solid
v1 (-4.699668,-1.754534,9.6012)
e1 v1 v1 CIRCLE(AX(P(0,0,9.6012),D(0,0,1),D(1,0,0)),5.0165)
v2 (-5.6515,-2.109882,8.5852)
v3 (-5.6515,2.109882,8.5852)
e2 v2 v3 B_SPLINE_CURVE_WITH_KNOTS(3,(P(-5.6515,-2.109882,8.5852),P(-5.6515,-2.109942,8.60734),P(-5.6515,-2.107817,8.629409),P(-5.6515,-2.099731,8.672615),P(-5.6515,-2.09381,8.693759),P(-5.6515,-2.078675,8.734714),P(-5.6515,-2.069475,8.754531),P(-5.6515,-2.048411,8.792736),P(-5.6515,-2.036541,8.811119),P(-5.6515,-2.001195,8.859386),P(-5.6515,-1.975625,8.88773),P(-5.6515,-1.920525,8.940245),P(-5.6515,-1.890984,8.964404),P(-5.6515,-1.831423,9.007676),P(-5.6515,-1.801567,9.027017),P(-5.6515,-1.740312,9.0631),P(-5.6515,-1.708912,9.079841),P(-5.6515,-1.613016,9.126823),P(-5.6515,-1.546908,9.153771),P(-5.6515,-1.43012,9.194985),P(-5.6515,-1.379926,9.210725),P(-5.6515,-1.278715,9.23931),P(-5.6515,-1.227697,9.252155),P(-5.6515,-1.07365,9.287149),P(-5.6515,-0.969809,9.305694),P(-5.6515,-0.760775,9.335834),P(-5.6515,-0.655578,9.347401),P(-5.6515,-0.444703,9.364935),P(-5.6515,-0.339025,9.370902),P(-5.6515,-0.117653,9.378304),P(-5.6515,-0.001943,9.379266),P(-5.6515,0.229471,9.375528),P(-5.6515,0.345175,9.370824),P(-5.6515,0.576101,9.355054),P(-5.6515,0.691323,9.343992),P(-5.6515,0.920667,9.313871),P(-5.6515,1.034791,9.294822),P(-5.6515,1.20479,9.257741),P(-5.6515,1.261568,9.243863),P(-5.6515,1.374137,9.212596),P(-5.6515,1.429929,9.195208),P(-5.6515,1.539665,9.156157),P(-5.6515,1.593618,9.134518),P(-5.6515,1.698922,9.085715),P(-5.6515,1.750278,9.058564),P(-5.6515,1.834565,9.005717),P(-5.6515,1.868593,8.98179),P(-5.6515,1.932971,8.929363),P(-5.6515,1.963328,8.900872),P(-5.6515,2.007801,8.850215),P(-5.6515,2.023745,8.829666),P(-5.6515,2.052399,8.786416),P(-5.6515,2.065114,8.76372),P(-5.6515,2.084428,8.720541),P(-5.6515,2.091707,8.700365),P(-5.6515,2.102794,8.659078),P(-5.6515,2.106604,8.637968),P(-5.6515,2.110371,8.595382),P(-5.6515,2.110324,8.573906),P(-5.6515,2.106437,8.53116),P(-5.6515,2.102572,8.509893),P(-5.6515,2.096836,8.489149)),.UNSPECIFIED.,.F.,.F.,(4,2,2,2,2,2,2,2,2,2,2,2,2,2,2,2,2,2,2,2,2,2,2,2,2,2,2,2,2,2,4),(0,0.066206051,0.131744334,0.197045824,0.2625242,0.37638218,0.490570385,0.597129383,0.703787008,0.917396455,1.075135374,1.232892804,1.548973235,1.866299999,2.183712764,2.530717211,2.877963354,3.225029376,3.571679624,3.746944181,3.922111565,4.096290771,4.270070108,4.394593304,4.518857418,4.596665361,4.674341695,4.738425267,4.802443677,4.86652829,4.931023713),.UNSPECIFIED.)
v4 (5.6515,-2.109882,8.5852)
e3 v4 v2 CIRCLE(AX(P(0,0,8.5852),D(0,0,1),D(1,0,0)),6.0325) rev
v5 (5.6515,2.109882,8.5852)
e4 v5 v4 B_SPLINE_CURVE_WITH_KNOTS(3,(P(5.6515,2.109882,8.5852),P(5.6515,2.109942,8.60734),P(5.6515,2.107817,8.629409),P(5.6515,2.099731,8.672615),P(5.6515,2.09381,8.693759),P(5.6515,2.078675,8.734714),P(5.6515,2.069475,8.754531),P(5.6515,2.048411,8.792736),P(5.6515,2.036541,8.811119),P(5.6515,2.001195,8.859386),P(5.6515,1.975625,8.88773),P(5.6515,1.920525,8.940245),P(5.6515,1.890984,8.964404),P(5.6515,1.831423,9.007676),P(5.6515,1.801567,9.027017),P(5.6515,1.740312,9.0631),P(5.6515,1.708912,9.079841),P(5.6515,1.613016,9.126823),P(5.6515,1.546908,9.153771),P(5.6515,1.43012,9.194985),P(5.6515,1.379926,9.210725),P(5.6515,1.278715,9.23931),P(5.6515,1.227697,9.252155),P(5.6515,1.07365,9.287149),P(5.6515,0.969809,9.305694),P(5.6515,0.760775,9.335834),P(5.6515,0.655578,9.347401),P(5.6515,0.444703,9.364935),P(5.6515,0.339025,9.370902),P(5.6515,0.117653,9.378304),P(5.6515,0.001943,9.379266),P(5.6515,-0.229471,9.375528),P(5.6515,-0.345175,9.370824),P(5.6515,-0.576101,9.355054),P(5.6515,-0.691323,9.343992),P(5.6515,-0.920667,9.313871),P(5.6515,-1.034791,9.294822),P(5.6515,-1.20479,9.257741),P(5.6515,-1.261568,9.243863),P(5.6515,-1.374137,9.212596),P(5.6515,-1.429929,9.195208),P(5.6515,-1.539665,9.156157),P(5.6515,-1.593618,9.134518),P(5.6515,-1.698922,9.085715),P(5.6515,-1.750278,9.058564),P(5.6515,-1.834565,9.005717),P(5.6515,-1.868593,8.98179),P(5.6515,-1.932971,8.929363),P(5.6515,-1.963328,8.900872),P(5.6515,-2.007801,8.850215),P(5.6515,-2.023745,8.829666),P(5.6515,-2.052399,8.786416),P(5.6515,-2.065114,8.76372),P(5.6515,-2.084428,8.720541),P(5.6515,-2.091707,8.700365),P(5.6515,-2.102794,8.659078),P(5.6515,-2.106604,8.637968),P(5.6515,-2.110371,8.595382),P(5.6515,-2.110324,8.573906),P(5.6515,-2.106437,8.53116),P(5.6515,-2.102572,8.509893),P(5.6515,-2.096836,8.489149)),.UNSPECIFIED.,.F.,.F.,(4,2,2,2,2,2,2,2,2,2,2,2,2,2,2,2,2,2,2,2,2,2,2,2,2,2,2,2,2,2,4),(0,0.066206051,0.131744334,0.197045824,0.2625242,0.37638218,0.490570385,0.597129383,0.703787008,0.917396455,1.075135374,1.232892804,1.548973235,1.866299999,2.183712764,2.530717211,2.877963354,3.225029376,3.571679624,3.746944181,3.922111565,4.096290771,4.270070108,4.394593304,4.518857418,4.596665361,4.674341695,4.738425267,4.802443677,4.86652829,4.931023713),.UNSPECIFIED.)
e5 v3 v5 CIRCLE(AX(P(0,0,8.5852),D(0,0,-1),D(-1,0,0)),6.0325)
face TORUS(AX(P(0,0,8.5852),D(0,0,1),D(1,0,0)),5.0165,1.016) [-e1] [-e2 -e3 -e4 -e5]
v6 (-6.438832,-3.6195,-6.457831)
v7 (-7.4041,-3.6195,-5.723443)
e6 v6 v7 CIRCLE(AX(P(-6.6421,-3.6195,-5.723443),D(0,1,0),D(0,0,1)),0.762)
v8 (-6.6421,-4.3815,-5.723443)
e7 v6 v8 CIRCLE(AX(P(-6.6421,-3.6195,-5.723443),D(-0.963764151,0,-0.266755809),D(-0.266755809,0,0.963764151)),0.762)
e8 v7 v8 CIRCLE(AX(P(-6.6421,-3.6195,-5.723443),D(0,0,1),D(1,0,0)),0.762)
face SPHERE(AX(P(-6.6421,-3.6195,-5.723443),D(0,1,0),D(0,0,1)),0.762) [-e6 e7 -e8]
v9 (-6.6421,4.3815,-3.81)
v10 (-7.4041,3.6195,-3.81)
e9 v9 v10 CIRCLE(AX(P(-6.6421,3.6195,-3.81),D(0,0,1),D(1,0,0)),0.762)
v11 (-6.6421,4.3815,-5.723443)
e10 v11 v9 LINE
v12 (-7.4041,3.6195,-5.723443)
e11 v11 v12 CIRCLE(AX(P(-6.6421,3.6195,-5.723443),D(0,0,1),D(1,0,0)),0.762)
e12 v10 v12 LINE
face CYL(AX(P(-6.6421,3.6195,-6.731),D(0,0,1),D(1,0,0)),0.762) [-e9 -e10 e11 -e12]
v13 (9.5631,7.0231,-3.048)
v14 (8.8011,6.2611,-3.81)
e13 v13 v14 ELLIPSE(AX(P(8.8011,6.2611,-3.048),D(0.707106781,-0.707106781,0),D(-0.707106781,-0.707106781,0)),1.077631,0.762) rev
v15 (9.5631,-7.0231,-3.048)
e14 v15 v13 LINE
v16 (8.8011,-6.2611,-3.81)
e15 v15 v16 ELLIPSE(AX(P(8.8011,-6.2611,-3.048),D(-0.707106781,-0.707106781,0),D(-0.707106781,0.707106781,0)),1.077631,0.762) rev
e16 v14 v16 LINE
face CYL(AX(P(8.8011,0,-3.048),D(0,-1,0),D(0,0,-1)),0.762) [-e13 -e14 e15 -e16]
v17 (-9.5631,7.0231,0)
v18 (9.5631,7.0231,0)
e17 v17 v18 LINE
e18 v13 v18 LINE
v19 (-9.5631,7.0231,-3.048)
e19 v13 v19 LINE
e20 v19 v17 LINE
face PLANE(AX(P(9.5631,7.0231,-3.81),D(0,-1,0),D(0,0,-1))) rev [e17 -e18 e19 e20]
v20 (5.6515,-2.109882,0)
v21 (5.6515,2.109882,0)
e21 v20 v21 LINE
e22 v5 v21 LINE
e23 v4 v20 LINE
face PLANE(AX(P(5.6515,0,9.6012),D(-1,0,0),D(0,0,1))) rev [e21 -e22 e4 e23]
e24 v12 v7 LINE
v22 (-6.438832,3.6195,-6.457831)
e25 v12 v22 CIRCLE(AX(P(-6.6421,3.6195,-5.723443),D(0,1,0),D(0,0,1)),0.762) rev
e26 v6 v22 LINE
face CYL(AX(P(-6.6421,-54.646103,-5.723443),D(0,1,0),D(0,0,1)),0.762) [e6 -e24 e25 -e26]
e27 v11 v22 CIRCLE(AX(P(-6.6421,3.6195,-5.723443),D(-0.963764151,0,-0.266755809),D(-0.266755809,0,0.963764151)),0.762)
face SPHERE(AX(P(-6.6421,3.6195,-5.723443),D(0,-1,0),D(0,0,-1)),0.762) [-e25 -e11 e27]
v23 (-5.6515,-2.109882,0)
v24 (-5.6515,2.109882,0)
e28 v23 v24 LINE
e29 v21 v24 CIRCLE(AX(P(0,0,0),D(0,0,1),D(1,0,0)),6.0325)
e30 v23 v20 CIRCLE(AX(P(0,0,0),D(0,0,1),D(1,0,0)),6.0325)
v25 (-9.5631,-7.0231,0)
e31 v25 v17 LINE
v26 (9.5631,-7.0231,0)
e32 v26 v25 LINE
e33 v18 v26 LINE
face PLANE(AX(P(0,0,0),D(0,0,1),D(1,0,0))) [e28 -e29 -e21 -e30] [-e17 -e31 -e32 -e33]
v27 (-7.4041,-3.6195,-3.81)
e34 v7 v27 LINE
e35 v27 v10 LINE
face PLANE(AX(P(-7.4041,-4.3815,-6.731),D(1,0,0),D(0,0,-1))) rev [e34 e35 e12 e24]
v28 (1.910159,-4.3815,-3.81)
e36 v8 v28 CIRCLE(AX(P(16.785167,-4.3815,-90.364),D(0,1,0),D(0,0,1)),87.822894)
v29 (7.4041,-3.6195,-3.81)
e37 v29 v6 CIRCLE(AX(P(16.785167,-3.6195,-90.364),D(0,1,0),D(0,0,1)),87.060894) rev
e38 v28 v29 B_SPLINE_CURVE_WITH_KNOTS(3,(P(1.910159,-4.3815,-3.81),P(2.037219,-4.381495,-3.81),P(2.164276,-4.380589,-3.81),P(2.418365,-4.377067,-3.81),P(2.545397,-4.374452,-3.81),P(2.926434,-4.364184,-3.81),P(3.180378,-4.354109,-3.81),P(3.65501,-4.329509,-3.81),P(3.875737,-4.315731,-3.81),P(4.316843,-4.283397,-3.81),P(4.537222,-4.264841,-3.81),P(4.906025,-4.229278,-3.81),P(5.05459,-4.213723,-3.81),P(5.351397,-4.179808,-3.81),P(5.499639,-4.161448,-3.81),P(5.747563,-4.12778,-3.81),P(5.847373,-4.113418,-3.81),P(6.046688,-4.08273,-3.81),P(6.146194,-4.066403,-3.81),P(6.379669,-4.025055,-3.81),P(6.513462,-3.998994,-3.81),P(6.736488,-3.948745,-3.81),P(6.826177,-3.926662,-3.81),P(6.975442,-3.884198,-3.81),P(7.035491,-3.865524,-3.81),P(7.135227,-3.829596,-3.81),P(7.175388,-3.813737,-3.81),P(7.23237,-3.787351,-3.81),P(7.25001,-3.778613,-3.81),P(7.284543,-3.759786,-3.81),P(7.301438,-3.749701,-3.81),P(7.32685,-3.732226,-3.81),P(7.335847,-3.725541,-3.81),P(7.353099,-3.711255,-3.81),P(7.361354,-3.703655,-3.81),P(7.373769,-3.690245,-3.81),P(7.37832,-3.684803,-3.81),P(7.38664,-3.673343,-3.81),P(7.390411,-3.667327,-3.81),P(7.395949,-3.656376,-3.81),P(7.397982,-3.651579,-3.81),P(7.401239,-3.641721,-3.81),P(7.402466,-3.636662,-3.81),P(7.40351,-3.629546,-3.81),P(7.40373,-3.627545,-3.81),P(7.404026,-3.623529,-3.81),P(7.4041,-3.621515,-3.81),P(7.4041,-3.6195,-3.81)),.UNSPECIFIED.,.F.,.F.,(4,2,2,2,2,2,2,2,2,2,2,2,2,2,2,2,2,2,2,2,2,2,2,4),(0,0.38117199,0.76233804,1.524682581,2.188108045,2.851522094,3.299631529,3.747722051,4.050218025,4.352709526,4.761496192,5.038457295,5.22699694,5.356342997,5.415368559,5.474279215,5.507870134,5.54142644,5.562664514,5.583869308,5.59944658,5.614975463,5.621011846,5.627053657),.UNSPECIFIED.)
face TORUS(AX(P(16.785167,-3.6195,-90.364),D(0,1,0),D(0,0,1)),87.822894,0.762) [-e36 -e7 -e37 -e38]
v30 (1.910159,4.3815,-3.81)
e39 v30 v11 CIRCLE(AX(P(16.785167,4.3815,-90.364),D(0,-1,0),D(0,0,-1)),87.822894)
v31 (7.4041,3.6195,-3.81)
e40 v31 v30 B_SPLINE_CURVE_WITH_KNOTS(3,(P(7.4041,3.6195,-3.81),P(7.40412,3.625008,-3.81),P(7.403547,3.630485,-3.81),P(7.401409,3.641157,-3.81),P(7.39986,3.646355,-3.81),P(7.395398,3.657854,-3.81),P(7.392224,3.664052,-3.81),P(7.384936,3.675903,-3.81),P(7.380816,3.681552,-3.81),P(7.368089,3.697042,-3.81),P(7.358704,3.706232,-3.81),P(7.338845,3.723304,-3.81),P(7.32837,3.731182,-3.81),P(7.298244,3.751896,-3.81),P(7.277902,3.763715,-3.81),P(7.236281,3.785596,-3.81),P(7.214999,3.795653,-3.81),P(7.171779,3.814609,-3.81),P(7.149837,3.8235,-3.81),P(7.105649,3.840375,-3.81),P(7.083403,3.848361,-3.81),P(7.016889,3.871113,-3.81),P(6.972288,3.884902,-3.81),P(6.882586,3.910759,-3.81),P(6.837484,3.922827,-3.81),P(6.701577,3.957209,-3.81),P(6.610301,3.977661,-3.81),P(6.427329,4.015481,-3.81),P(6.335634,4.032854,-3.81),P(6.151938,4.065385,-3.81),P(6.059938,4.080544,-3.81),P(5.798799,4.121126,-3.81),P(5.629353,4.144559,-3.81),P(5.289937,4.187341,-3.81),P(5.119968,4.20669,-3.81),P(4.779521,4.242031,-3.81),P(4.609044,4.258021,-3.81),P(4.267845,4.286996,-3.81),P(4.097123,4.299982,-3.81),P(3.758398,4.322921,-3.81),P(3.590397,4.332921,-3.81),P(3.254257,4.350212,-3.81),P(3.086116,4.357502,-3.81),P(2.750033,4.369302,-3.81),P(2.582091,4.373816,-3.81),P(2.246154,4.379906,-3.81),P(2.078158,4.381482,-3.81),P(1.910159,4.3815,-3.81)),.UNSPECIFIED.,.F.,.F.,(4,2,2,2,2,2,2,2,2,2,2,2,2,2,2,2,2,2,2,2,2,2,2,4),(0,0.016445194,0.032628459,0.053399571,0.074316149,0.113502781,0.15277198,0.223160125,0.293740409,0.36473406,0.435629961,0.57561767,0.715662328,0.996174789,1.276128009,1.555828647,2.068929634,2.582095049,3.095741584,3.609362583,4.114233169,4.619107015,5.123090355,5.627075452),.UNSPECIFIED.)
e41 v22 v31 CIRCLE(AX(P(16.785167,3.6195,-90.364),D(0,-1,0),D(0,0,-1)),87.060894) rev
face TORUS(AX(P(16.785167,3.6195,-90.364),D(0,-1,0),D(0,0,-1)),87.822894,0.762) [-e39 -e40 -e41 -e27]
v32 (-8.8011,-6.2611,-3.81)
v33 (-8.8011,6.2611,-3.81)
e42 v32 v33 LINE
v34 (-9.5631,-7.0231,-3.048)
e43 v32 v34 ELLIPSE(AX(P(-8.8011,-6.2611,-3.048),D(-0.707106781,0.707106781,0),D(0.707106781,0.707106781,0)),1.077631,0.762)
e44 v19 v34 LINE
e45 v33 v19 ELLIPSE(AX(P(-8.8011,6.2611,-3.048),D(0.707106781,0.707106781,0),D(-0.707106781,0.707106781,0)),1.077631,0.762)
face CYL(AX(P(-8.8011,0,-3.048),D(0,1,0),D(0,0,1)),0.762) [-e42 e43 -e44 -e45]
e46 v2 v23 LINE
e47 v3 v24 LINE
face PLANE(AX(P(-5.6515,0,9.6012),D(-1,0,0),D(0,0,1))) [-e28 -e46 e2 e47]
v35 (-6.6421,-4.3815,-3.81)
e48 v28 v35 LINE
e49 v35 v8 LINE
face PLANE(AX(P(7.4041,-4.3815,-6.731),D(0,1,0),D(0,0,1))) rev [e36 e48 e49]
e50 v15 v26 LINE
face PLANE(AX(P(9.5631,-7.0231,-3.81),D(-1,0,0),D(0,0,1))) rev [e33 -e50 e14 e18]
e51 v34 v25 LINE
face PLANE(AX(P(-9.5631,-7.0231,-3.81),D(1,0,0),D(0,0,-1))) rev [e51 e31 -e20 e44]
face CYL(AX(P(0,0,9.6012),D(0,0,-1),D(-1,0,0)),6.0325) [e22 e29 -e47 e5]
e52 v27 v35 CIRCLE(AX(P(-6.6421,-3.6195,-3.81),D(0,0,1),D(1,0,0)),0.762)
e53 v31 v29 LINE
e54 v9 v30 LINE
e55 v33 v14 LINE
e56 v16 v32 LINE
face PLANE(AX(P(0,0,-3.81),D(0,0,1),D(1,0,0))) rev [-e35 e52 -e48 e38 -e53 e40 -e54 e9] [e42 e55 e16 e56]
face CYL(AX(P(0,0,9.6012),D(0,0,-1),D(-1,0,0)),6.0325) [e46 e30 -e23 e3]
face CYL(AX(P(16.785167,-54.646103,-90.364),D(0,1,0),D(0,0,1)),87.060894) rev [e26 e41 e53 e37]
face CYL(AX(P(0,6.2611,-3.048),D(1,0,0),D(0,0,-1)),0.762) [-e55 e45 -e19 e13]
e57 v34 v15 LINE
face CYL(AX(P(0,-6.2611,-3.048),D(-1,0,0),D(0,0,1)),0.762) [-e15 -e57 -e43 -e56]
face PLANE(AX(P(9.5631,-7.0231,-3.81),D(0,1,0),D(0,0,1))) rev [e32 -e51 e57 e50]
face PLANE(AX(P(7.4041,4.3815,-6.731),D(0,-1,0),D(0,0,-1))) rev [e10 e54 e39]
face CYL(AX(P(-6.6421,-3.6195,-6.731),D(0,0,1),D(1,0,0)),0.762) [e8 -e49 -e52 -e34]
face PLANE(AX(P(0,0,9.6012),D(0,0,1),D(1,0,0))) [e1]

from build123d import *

# Parameters (mm, degrees)
SKETCH1_W               = 11.303
SKETCH1_H               = 4.219764922
BOSS_EXTRUDE1_DEPTH     = 9.6012
SKETCH2_W               = 19.1262
SKETCH2_H               = 14.0462
BOSS_EXTRUDE2_DEPTH     = 3.81
SKETCH3_W               = 14.8082
SKETCH3_H               = 8.763
BOSS_EXTRUDE3_DEPTH     = 2.921
CUT_EXTRUDE1_DEPTH      = 18.711601402
CUT_EXTRUDE1_DEPTH_BACK = 18.711601402
FILLET1_R               = 0.762
FILLET2_R               = 0.762
FILLET3_R               = 0.762
FILLET4_R               = 1.016


with BuildPart() as part:
    # Sketch1 → Boss-Extrude1 (new body)
    with BuildSketch(Plane.XY):
        with BuildLine():
            ThreePointArc((5.6515, 2.109882461), (0, 6.0325), (-5.6515, 2.109882461))
            Line((-5.6515, 2.109882461), (5.6515, 2.109882461))
        make_face()
        Rectangle(SKETCH1_W, SKETCH1_H)
        with BuildLine():
            Line((5.6515, -2.109882461), (-5.6515, -2.109882461))
            ThreePointArc((-5.6515, -2.109882461), (0, -6.0325), (5.6515, -2.109882461))
        make_face()
    extrude(amount=BOSS_EXTRUDE1_DEPTH)

    # Sketch2 → Boss-Extrude2 (add)
    with BuildSketch(Plane(origin=(0, 0, 0), x_dir=(-1, 0, 0), z_dir=(0, 0, -1))):
        Rectangle(SKETCH2_W, SKETCH2_H)
    extrude(amount=BOSS_EXTRUDE2_DEPTH)

    # Sketch3 → Boss-Extrude3 (add)
    with BuildSketch(Plane(origin=(0, 0, -3.81), x_dir=(-1, 0, 0), z_dir=(0, 0, -1))):
        Rectangle(SKETCH3_W, SKETCH3_H)
    extrude(amount=BOSS_EXTRUDE3_DEPTH)

    # Sketch4 → Cut-Extrude1 (cut, two sides: drawn at the far end of the back side and taken through both)
    with BuildSketch(Plane.XZ.offset(4.3815).offset(-CUT_EXTRUDE1_DEPTH_BACK)):
        with BuildLine():
            Line((7.4041, -6.731), (7.4041, -3.81))
            ThreePointArc((7.4041, -3.81), (-0.063420224, -4.948987039), (-7.4041, -6.731))
            Line((-7.4041, -6.731), (7.4041, -6.731))
        make_face()
    extrude(amount=CUT_EXTRUDE1_DEPTH + CUT_EXTRUDE1_DEPTH_BACK, mode=Mode.SUBTRACT)

    # Fillet1
    fillet1_edges = [part.edges().sort_by_distance(p)[0] for p in [
        (-7.4041, 0, -6.731),
    ]]
    fillet(fillet1_edges, radius=FILLET1_R)

    # Fillet2
    fillet2_edges = [part.edges().sort_by_distance(p)[0] for p in [
        (-9.5631, 0, -3.81),
        (0, 7.0231, -3.81),
        (9.5631, 0, -3.81),
        (0, -7.0231, -3.81),
    ]]
    fillet(fillet2_edges, radius=FILLET2_R)

    # Fillet3
    fillet3_edges = [part.edges().sort_by_distance(p)[0] for p in [
        (0.428965251, -4.3815, -4.853334027),
        (0.428965251, 4.3815, -4.853334027),
        (-7.4041, 4.3815, -4.766721364),
        (-7.103485869, 4.3815, -6.329880754),
        (-7.4041, -4.3815, -4.766721364),
        (-7.103485869, -4.3815, -6.329880754),
    ]]
    fillet(fillet3_edges, radius=FILLET3_R)

    # Fillet4
    # the kernel refuses this fillet: 1.016 mm, written as the material it takes off along each edge
    with BuildSketch(Plane(origin=(0, 0, 9.6012), x_dir=(0.9979431218880589, -0.06410558069555868, 0), z_dir=(-0.06410558069555868, -0.9979431218880589, 0))) as fillet4_piece_1:
        with BuildLine():
            CenterArc((6.0325 - FILLET4_R, -FILLET4_R), FILLET4_R, 0, 90)
            Line((6.0325 - FILLET4_R, 0), (6.0325, 0))
            Line((6.0325, 0), (6.0325, -FILLET4_R))
        make_face()
    revolve(axis=Axis((0, 0, 9.6012), (0, 0, 1)), revolution_arc=187.350999162, mode=Mode.SUBTRACT)
    with BuildSketch(Plane(origin=(0, 0, 9.6012), x_dir=(-0.9979431218880589, 0.06410558069555859, 0), z_dir=(0.06410558069555859, 0.9979431218880589, 0))) as fillet4_piece_2:
        with BuildLine():
            CenterArc((6.0325 - FILLET4_R, -FILLET4_R), FILLET4_R, 0, 90)
            Line((6.0325 - FILLET4_R, 0), (6.0325, 0))
            Line((6.0325, 0), (6.0325, -FILLET4_R))
        make_face()
    revolve(axis=Axis((0, 0, 9.6012), (0, 0, 1)), revolution_arc=187.350999162, mode=Mode.SUBTRACT)


solid = part.part
